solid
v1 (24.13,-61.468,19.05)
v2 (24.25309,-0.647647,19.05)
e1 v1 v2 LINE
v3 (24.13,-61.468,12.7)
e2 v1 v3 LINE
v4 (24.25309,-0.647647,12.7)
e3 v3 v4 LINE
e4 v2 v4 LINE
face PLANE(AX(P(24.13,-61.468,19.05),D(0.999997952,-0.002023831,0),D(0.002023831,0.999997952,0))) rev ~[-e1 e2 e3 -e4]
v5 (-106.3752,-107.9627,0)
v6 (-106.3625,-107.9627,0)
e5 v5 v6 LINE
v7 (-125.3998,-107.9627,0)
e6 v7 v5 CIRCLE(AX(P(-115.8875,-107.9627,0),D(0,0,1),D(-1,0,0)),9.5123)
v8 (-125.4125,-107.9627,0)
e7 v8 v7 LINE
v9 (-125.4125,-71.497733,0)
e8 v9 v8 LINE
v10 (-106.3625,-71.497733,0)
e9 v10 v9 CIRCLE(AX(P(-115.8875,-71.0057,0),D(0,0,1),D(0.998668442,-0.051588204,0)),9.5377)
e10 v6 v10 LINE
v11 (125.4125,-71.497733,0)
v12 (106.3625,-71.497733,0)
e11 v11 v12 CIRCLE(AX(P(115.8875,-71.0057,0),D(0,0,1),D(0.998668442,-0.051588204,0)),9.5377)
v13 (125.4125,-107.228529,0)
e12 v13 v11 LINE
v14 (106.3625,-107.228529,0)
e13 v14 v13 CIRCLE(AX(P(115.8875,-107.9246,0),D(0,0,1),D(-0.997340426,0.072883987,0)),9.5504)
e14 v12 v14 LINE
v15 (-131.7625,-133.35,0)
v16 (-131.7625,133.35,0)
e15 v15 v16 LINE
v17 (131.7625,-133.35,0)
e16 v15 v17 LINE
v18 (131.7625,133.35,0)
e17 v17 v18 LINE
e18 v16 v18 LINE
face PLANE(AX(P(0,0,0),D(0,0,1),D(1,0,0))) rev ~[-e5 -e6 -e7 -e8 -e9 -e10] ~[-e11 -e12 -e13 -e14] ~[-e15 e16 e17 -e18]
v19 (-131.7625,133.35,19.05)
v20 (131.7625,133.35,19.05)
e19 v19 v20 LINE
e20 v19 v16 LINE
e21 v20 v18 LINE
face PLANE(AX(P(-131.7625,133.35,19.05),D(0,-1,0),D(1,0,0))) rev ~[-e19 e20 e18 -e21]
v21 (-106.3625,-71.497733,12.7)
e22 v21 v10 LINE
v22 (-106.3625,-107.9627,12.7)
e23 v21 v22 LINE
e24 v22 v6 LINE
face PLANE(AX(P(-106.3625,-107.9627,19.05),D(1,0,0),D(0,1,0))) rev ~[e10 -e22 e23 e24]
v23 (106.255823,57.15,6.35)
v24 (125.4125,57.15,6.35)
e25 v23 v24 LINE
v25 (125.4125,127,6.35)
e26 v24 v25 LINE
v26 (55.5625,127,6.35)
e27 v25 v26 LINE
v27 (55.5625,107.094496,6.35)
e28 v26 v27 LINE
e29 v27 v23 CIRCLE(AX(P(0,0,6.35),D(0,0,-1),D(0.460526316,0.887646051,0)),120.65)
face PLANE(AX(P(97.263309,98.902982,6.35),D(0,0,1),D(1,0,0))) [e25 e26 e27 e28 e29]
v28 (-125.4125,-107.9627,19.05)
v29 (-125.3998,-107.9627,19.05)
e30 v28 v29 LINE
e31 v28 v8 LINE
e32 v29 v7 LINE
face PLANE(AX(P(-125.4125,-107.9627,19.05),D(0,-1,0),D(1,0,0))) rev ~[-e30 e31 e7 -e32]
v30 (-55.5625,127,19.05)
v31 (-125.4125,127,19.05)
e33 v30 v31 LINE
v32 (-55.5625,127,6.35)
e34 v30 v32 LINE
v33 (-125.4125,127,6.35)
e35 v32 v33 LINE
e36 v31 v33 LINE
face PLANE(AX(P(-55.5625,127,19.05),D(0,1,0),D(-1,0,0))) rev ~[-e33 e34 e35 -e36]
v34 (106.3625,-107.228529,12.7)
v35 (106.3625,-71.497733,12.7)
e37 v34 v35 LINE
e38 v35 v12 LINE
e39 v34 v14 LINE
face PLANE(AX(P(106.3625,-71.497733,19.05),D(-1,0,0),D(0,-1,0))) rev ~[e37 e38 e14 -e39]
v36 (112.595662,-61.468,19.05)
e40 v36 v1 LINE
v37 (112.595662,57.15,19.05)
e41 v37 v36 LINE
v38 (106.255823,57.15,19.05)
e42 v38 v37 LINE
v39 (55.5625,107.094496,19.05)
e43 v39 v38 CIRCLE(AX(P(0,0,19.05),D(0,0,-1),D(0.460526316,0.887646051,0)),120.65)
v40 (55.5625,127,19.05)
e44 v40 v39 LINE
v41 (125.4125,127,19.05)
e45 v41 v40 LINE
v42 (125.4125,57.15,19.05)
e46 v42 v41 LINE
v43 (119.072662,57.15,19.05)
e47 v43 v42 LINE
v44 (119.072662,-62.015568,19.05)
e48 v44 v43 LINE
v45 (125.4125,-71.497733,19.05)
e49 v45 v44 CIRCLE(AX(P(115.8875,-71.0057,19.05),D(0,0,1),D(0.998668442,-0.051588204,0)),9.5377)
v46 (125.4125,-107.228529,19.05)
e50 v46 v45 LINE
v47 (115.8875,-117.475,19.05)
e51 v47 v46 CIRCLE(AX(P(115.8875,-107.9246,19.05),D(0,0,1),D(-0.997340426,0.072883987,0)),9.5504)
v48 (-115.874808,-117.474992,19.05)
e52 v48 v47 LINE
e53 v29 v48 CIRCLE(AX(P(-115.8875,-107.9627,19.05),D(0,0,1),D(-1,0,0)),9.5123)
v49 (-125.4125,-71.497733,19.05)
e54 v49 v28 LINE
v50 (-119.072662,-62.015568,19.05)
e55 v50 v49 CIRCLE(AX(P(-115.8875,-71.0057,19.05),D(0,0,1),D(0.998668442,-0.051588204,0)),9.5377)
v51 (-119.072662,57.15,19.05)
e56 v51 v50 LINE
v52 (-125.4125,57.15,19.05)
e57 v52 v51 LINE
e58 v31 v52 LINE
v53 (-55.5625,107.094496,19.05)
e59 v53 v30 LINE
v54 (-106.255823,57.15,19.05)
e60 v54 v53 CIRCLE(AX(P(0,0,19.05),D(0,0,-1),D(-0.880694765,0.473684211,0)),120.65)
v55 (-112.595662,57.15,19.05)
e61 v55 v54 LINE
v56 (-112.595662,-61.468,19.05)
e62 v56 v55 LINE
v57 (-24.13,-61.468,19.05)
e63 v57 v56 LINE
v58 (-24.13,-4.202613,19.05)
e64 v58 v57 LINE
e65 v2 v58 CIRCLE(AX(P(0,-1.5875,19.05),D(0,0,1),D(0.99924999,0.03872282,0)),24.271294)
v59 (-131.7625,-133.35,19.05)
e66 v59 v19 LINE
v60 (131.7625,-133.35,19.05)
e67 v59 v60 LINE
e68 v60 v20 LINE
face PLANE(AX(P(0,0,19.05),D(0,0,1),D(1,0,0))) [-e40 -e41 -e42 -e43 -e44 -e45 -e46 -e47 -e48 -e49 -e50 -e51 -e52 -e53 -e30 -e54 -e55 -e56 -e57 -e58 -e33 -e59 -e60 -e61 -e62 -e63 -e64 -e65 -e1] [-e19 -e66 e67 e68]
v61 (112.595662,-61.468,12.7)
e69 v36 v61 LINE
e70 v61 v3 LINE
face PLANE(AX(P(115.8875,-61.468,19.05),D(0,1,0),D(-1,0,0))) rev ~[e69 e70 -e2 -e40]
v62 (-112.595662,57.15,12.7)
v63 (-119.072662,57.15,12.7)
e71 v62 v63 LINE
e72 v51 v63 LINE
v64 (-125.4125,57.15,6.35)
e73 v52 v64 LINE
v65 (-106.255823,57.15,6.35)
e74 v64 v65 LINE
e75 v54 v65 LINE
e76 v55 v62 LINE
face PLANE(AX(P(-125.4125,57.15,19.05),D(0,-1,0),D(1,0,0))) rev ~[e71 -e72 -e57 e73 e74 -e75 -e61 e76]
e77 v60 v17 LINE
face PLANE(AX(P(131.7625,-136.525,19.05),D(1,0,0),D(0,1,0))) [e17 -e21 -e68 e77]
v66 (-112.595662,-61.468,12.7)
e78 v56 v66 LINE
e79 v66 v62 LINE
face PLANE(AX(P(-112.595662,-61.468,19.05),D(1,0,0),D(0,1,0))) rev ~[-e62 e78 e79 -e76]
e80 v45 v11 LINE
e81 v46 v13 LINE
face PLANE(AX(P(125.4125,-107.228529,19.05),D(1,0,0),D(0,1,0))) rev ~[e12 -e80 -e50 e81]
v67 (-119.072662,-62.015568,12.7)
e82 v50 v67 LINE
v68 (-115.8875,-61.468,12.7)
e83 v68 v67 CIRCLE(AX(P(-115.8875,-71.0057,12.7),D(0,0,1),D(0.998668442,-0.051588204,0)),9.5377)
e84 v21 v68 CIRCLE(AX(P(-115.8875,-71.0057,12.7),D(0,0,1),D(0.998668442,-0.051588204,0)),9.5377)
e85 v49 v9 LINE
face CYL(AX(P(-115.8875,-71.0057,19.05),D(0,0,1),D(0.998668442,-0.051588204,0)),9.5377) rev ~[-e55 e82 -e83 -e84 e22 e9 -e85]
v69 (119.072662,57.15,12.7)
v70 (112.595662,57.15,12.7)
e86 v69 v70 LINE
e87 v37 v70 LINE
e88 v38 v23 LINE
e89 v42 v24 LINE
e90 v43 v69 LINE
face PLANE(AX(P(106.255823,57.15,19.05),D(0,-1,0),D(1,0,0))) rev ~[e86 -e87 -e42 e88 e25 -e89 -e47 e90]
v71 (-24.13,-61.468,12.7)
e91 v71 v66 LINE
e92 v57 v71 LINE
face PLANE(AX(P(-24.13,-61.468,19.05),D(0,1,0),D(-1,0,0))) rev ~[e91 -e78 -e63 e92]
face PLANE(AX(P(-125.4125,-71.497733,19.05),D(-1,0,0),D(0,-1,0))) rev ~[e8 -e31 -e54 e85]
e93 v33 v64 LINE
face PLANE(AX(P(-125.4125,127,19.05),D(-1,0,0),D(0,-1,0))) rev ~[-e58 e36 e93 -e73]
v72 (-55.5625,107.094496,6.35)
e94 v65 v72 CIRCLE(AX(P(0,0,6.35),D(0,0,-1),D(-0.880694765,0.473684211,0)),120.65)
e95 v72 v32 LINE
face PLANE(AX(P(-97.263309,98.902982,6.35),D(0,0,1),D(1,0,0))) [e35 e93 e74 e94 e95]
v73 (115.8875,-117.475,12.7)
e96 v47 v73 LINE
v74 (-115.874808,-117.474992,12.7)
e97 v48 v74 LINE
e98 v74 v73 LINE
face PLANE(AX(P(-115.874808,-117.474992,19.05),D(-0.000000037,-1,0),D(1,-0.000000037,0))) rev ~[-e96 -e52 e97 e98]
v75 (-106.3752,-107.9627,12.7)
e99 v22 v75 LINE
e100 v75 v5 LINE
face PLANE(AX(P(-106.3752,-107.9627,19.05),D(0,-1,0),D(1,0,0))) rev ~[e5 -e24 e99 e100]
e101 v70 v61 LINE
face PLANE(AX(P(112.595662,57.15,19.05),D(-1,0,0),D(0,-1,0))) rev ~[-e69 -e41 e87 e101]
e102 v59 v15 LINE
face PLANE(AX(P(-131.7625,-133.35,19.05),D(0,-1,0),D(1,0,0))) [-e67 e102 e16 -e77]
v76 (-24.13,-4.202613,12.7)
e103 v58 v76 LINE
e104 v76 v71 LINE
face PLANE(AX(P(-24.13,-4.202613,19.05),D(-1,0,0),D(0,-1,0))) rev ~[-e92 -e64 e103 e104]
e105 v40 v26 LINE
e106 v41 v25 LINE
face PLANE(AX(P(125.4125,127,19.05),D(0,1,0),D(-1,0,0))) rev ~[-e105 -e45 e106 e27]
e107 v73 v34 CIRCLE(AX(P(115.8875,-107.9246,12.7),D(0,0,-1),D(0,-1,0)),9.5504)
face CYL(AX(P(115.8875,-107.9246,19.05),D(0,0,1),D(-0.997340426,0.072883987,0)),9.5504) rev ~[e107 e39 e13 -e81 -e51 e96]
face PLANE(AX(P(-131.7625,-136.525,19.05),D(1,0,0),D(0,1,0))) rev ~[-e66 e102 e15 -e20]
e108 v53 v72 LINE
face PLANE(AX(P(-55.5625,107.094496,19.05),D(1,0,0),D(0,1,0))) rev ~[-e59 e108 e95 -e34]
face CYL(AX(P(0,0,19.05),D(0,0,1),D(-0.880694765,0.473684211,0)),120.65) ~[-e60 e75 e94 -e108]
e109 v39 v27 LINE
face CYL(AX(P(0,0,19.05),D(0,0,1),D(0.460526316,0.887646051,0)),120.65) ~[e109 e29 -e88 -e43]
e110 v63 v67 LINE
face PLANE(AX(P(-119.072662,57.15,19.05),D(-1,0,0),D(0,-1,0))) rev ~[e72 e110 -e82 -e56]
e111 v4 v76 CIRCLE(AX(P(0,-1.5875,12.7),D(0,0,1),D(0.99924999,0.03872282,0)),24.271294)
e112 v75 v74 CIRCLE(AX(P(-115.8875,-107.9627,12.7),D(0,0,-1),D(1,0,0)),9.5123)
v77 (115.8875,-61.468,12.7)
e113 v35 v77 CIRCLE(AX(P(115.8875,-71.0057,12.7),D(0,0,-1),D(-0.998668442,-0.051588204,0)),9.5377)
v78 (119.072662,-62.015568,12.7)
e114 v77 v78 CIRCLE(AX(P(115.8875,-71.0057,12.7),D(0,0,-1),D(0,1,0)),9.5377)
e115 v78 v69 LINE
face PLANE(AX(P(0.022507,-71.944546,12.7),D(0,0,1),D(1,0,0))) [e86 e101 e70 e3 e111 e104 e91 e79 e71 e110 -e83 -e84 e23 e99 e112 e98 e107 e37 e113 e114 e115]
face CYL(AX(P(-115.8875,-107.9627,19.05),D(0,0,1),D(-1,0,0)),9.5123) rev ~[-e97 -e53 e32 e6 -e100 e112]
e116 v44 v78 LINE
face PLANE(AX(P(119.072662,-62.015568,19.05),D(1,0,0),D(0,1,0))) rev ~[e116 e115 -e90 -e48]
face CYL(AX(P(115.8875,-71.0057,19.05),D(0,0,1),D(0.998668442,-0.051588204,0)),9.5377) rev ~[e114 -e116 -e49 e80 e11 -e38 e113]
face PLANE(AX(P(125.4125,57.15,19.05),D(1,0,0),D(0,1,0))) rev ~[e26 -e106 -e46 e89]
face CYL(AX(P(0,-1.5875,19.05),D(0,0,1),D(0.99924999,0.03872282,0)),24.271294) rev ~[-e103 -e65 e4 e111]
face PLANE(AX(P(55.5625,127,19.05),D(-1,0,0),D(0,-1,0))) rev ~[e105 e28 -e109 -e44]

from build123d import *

# Parameters (mm, degrees)
F0_W      = 269.875
F0_H      = 273.05
F1_DEPTH  = 19.05
F3_DEPTH  = 12.7
F5_DEPTH  = 19.05
F6_W      = 3.175
F6_H      = 273.05
F7_DEPTH  = 19.05
F8_W      = 263.525
F8_H      = 3.175
F9_DEPTH  = 19.05
F11_DEPTH = 6.35
F13_DEPTH = 6.35
F14_W     = 263.525
F14_H     = 3.175
F15_DEPTH = 19.05


# Not quite as in the source:
# - ends of sketch curves that miss each other by under 0.0002 mm in the source are joined


with BuildPart() as f1:
    # F0 (on Top) → F1 (new body)
    with BuildSketch(Plane.XY):
        Rectangle(F0_W, F0_H)
    extrude(amount=F1_DEPTH)

    # F2 (on face) → F3 (cut)
    with BuildSketch(Plane.XY.offset(19.05)):
        with BuildLine():
            ThreePointArc((55.5625, 107.0944960946), (84.6752951993, 85.9448479137), (106.2558233698, 57.15))
            Line((106.2558233698, 57.15), (125.4125, 57.15))
            Line((125.4125, 57.15), (125.4125, 127))
            Line((125.4125, 127), (55.5625, 127))
            Line((55.5625, 127), (55.5625, 107.0944960946))
        make_face()
        with BuildLine():
            Line((-125.4125, 57.15), (-106.2558233698, 57.15))
            ThreePointArc((-106.2558233698, 57.15), (-84.6752951993, 85.9448479137), (-55.5625, 107.0944960946))
            Line((-55.5625, 107.0944960946), (-55.5625, 127))
            Line((-55.5625, 127), (-125.4125, 127))
            Line((-125.4125, 127), (-125.4125, 57.15))
        make_face()
    extrude(amount=-F3_DEPTH, mode=Mode.SUBTRACT)

    # F4 (on face) → F5 (cut, through all)
    with BuildSketch(Plane.XY.offset(19.05)):
        with BuildLine():
            Line((-106.3625, -107.9627), (-106.3625, -71.4977328139))
            ThreePointArc((-106.3625, -71.4977328139), (-115.8875, -61.468), (-125.4125, -71.4977328139))
            Line((-125.4125, -71.4977328139), (-125.4125, -107.9627))
            Line((-125.4125, -107.9627), (-125.3998, -107.9627))
            ThreePointArc((-125.3998, -107.9627), (-115.8875, -117.475), (-106.3752, -107.9627))
            Line((-106.3752, -107.9627), (-106.3625, -107.9627))
        make_face()
        with BuildLine():
            ThreePointArc((125.4125, -71.4977328139), (115.8875, -61.468), (106.3625, -71.4977328139))
            Line((106.3625, -71.4977328139), (106.3625, -107.228528768))
            ThreePointArc((106.3625, -107.228528768), (115.8875, -117.475), (125.4125, -107.228528768))
            Line((125.4125, -107.228528768), (125.4125, -71.4977328139))
        make_face()
    extrude(amount=-F5_DEPTH, mode=Mode.SUBTRACT)

    # F6 (on face) → F7 (cut, through all)
    with BuildSketch(Plane.XY.offset(19.05)):
        with Locations((-133.35, 0)):
            Rectangle(F6_W, F6_H)
        with Locations((133.35, 0)):
            Rectangle(F6_W, F6_H)
    extrude(amount=-F7_DEPTH, mode=Mode.SUBTRACT)

    # F8 (on face) → F9 (cut, through all)
    with BuildSketch(Plane.XY.offset(19.05)):
        with Locations((0, 134.9375)):
            Rectangle(F8_W, F8_H)
    extrude(amount=-F9_DEPTH, mode=Mode.SUBTRACT)

    # F10 (on face) → F11 (cut)
    with BuildSketch(Plane.XY.offset(19.05)):
        with BuildLine():
            Line((24.2490875216, -2.6255133905), (24.253090398, -0.6476470458))
            ThreePointArc((24.253090398, -0.6476470458), (-1.7785482929, 22.6185422911), (-24.13, -4.2026132727))
            Line((-24.13, -4.2026132727), (-24.13, -61.468))
            Line((-24.13, -61.468), (-115.8875, -61.468))
            ThreePointArc((-115.8875, -61.468), (-108.9715552829, -64.4377908989), (-106.3625, -71.4977328139))
            Line((-106.3625, -71.4977328139), (-106.3625, -107.9627))
            Line((-106.3625, -107.9627), (-106.3752, -107.9627))
            ThreePointArc((-106.3752, -107.9627), (-109.1568025344, -114.6844232103), (-115.8748084893, -117.4749915334))
            Line((-115.8748084893, -117.4749915334), (115.8875, -117.475))
            ThreePointArc((115.8875, -117.475), (108.892576882, -114.4269988445), (106.3625, -107.228528768))
            Line((106.3625, -107.228528768), (106.3625, -71.4977328139))
            ThreePointArc((106.3625, -71.4977328139), (108.9715552829, -64.4377908989), (115.8875, -61.468))
            Line((115.8875, -61.468), (24.13, -61.468))
            Line((24.13, -61.468), (24.2490875216, -2.6255133905))
        make_face()
    extrude(amount=-F11_DEPTH, mode=Mode.SUBTRACT)

    # F12 (on face) → F13 (cut)
    with BuildSketch(Plane.XY.offset(19.05)):
        with BuildLine():
            Line((119.0726616849, 57.15), (112.5956616849, 57.15))
            Line((112.5956616849, 57.15), (112.5956616849, -61.468))
            Line((112.5956616849, -61.468), (115.8875, -61.468))
            ThreePointArc((115.8875, -61.468), (117.5034429216, -61.6058888442), (119.0726616849, -62.0155683919))
            Line((119.0726616849, -62.0155683919), (119.0726616849, 57.15))
        make_face()
        with BuildLine():
            Line((-115.8341616849, -61.468), (-112.5956616849, -61.468))
            Line((-112.5956616849, -61.468), (-112.5956616849, 57.15))
            Line((-112.5956616849, 57.15), (-119.0726616849, 57.15))
            Line((-119.0726616849, 57.15), (-119.0726616849, -61.468))
            Line((-119.0726616849, -61.468), (-119.0726616849, -62.0155683919))
            ThreePointArc((-119.0726616849, -62.0155683919), (-117.4763944176, -61.6058567373), (-115.8341616849, -61.468))
        make_face()
    extrude(amount=-F13_DEPTH, mode=Mode.SUBTRACT)

    # F14 (on face) → F15 (cut, through all)
    with BuildSketch(Plane.XY.offset(19.05)):
        with Locations((0, -134.9375)):
            Rectangle(F14_W, F14_H)
    extrude(amount=-F15_DEPTH, mode=Mode.SUBTRACT)


solid = f1.part
